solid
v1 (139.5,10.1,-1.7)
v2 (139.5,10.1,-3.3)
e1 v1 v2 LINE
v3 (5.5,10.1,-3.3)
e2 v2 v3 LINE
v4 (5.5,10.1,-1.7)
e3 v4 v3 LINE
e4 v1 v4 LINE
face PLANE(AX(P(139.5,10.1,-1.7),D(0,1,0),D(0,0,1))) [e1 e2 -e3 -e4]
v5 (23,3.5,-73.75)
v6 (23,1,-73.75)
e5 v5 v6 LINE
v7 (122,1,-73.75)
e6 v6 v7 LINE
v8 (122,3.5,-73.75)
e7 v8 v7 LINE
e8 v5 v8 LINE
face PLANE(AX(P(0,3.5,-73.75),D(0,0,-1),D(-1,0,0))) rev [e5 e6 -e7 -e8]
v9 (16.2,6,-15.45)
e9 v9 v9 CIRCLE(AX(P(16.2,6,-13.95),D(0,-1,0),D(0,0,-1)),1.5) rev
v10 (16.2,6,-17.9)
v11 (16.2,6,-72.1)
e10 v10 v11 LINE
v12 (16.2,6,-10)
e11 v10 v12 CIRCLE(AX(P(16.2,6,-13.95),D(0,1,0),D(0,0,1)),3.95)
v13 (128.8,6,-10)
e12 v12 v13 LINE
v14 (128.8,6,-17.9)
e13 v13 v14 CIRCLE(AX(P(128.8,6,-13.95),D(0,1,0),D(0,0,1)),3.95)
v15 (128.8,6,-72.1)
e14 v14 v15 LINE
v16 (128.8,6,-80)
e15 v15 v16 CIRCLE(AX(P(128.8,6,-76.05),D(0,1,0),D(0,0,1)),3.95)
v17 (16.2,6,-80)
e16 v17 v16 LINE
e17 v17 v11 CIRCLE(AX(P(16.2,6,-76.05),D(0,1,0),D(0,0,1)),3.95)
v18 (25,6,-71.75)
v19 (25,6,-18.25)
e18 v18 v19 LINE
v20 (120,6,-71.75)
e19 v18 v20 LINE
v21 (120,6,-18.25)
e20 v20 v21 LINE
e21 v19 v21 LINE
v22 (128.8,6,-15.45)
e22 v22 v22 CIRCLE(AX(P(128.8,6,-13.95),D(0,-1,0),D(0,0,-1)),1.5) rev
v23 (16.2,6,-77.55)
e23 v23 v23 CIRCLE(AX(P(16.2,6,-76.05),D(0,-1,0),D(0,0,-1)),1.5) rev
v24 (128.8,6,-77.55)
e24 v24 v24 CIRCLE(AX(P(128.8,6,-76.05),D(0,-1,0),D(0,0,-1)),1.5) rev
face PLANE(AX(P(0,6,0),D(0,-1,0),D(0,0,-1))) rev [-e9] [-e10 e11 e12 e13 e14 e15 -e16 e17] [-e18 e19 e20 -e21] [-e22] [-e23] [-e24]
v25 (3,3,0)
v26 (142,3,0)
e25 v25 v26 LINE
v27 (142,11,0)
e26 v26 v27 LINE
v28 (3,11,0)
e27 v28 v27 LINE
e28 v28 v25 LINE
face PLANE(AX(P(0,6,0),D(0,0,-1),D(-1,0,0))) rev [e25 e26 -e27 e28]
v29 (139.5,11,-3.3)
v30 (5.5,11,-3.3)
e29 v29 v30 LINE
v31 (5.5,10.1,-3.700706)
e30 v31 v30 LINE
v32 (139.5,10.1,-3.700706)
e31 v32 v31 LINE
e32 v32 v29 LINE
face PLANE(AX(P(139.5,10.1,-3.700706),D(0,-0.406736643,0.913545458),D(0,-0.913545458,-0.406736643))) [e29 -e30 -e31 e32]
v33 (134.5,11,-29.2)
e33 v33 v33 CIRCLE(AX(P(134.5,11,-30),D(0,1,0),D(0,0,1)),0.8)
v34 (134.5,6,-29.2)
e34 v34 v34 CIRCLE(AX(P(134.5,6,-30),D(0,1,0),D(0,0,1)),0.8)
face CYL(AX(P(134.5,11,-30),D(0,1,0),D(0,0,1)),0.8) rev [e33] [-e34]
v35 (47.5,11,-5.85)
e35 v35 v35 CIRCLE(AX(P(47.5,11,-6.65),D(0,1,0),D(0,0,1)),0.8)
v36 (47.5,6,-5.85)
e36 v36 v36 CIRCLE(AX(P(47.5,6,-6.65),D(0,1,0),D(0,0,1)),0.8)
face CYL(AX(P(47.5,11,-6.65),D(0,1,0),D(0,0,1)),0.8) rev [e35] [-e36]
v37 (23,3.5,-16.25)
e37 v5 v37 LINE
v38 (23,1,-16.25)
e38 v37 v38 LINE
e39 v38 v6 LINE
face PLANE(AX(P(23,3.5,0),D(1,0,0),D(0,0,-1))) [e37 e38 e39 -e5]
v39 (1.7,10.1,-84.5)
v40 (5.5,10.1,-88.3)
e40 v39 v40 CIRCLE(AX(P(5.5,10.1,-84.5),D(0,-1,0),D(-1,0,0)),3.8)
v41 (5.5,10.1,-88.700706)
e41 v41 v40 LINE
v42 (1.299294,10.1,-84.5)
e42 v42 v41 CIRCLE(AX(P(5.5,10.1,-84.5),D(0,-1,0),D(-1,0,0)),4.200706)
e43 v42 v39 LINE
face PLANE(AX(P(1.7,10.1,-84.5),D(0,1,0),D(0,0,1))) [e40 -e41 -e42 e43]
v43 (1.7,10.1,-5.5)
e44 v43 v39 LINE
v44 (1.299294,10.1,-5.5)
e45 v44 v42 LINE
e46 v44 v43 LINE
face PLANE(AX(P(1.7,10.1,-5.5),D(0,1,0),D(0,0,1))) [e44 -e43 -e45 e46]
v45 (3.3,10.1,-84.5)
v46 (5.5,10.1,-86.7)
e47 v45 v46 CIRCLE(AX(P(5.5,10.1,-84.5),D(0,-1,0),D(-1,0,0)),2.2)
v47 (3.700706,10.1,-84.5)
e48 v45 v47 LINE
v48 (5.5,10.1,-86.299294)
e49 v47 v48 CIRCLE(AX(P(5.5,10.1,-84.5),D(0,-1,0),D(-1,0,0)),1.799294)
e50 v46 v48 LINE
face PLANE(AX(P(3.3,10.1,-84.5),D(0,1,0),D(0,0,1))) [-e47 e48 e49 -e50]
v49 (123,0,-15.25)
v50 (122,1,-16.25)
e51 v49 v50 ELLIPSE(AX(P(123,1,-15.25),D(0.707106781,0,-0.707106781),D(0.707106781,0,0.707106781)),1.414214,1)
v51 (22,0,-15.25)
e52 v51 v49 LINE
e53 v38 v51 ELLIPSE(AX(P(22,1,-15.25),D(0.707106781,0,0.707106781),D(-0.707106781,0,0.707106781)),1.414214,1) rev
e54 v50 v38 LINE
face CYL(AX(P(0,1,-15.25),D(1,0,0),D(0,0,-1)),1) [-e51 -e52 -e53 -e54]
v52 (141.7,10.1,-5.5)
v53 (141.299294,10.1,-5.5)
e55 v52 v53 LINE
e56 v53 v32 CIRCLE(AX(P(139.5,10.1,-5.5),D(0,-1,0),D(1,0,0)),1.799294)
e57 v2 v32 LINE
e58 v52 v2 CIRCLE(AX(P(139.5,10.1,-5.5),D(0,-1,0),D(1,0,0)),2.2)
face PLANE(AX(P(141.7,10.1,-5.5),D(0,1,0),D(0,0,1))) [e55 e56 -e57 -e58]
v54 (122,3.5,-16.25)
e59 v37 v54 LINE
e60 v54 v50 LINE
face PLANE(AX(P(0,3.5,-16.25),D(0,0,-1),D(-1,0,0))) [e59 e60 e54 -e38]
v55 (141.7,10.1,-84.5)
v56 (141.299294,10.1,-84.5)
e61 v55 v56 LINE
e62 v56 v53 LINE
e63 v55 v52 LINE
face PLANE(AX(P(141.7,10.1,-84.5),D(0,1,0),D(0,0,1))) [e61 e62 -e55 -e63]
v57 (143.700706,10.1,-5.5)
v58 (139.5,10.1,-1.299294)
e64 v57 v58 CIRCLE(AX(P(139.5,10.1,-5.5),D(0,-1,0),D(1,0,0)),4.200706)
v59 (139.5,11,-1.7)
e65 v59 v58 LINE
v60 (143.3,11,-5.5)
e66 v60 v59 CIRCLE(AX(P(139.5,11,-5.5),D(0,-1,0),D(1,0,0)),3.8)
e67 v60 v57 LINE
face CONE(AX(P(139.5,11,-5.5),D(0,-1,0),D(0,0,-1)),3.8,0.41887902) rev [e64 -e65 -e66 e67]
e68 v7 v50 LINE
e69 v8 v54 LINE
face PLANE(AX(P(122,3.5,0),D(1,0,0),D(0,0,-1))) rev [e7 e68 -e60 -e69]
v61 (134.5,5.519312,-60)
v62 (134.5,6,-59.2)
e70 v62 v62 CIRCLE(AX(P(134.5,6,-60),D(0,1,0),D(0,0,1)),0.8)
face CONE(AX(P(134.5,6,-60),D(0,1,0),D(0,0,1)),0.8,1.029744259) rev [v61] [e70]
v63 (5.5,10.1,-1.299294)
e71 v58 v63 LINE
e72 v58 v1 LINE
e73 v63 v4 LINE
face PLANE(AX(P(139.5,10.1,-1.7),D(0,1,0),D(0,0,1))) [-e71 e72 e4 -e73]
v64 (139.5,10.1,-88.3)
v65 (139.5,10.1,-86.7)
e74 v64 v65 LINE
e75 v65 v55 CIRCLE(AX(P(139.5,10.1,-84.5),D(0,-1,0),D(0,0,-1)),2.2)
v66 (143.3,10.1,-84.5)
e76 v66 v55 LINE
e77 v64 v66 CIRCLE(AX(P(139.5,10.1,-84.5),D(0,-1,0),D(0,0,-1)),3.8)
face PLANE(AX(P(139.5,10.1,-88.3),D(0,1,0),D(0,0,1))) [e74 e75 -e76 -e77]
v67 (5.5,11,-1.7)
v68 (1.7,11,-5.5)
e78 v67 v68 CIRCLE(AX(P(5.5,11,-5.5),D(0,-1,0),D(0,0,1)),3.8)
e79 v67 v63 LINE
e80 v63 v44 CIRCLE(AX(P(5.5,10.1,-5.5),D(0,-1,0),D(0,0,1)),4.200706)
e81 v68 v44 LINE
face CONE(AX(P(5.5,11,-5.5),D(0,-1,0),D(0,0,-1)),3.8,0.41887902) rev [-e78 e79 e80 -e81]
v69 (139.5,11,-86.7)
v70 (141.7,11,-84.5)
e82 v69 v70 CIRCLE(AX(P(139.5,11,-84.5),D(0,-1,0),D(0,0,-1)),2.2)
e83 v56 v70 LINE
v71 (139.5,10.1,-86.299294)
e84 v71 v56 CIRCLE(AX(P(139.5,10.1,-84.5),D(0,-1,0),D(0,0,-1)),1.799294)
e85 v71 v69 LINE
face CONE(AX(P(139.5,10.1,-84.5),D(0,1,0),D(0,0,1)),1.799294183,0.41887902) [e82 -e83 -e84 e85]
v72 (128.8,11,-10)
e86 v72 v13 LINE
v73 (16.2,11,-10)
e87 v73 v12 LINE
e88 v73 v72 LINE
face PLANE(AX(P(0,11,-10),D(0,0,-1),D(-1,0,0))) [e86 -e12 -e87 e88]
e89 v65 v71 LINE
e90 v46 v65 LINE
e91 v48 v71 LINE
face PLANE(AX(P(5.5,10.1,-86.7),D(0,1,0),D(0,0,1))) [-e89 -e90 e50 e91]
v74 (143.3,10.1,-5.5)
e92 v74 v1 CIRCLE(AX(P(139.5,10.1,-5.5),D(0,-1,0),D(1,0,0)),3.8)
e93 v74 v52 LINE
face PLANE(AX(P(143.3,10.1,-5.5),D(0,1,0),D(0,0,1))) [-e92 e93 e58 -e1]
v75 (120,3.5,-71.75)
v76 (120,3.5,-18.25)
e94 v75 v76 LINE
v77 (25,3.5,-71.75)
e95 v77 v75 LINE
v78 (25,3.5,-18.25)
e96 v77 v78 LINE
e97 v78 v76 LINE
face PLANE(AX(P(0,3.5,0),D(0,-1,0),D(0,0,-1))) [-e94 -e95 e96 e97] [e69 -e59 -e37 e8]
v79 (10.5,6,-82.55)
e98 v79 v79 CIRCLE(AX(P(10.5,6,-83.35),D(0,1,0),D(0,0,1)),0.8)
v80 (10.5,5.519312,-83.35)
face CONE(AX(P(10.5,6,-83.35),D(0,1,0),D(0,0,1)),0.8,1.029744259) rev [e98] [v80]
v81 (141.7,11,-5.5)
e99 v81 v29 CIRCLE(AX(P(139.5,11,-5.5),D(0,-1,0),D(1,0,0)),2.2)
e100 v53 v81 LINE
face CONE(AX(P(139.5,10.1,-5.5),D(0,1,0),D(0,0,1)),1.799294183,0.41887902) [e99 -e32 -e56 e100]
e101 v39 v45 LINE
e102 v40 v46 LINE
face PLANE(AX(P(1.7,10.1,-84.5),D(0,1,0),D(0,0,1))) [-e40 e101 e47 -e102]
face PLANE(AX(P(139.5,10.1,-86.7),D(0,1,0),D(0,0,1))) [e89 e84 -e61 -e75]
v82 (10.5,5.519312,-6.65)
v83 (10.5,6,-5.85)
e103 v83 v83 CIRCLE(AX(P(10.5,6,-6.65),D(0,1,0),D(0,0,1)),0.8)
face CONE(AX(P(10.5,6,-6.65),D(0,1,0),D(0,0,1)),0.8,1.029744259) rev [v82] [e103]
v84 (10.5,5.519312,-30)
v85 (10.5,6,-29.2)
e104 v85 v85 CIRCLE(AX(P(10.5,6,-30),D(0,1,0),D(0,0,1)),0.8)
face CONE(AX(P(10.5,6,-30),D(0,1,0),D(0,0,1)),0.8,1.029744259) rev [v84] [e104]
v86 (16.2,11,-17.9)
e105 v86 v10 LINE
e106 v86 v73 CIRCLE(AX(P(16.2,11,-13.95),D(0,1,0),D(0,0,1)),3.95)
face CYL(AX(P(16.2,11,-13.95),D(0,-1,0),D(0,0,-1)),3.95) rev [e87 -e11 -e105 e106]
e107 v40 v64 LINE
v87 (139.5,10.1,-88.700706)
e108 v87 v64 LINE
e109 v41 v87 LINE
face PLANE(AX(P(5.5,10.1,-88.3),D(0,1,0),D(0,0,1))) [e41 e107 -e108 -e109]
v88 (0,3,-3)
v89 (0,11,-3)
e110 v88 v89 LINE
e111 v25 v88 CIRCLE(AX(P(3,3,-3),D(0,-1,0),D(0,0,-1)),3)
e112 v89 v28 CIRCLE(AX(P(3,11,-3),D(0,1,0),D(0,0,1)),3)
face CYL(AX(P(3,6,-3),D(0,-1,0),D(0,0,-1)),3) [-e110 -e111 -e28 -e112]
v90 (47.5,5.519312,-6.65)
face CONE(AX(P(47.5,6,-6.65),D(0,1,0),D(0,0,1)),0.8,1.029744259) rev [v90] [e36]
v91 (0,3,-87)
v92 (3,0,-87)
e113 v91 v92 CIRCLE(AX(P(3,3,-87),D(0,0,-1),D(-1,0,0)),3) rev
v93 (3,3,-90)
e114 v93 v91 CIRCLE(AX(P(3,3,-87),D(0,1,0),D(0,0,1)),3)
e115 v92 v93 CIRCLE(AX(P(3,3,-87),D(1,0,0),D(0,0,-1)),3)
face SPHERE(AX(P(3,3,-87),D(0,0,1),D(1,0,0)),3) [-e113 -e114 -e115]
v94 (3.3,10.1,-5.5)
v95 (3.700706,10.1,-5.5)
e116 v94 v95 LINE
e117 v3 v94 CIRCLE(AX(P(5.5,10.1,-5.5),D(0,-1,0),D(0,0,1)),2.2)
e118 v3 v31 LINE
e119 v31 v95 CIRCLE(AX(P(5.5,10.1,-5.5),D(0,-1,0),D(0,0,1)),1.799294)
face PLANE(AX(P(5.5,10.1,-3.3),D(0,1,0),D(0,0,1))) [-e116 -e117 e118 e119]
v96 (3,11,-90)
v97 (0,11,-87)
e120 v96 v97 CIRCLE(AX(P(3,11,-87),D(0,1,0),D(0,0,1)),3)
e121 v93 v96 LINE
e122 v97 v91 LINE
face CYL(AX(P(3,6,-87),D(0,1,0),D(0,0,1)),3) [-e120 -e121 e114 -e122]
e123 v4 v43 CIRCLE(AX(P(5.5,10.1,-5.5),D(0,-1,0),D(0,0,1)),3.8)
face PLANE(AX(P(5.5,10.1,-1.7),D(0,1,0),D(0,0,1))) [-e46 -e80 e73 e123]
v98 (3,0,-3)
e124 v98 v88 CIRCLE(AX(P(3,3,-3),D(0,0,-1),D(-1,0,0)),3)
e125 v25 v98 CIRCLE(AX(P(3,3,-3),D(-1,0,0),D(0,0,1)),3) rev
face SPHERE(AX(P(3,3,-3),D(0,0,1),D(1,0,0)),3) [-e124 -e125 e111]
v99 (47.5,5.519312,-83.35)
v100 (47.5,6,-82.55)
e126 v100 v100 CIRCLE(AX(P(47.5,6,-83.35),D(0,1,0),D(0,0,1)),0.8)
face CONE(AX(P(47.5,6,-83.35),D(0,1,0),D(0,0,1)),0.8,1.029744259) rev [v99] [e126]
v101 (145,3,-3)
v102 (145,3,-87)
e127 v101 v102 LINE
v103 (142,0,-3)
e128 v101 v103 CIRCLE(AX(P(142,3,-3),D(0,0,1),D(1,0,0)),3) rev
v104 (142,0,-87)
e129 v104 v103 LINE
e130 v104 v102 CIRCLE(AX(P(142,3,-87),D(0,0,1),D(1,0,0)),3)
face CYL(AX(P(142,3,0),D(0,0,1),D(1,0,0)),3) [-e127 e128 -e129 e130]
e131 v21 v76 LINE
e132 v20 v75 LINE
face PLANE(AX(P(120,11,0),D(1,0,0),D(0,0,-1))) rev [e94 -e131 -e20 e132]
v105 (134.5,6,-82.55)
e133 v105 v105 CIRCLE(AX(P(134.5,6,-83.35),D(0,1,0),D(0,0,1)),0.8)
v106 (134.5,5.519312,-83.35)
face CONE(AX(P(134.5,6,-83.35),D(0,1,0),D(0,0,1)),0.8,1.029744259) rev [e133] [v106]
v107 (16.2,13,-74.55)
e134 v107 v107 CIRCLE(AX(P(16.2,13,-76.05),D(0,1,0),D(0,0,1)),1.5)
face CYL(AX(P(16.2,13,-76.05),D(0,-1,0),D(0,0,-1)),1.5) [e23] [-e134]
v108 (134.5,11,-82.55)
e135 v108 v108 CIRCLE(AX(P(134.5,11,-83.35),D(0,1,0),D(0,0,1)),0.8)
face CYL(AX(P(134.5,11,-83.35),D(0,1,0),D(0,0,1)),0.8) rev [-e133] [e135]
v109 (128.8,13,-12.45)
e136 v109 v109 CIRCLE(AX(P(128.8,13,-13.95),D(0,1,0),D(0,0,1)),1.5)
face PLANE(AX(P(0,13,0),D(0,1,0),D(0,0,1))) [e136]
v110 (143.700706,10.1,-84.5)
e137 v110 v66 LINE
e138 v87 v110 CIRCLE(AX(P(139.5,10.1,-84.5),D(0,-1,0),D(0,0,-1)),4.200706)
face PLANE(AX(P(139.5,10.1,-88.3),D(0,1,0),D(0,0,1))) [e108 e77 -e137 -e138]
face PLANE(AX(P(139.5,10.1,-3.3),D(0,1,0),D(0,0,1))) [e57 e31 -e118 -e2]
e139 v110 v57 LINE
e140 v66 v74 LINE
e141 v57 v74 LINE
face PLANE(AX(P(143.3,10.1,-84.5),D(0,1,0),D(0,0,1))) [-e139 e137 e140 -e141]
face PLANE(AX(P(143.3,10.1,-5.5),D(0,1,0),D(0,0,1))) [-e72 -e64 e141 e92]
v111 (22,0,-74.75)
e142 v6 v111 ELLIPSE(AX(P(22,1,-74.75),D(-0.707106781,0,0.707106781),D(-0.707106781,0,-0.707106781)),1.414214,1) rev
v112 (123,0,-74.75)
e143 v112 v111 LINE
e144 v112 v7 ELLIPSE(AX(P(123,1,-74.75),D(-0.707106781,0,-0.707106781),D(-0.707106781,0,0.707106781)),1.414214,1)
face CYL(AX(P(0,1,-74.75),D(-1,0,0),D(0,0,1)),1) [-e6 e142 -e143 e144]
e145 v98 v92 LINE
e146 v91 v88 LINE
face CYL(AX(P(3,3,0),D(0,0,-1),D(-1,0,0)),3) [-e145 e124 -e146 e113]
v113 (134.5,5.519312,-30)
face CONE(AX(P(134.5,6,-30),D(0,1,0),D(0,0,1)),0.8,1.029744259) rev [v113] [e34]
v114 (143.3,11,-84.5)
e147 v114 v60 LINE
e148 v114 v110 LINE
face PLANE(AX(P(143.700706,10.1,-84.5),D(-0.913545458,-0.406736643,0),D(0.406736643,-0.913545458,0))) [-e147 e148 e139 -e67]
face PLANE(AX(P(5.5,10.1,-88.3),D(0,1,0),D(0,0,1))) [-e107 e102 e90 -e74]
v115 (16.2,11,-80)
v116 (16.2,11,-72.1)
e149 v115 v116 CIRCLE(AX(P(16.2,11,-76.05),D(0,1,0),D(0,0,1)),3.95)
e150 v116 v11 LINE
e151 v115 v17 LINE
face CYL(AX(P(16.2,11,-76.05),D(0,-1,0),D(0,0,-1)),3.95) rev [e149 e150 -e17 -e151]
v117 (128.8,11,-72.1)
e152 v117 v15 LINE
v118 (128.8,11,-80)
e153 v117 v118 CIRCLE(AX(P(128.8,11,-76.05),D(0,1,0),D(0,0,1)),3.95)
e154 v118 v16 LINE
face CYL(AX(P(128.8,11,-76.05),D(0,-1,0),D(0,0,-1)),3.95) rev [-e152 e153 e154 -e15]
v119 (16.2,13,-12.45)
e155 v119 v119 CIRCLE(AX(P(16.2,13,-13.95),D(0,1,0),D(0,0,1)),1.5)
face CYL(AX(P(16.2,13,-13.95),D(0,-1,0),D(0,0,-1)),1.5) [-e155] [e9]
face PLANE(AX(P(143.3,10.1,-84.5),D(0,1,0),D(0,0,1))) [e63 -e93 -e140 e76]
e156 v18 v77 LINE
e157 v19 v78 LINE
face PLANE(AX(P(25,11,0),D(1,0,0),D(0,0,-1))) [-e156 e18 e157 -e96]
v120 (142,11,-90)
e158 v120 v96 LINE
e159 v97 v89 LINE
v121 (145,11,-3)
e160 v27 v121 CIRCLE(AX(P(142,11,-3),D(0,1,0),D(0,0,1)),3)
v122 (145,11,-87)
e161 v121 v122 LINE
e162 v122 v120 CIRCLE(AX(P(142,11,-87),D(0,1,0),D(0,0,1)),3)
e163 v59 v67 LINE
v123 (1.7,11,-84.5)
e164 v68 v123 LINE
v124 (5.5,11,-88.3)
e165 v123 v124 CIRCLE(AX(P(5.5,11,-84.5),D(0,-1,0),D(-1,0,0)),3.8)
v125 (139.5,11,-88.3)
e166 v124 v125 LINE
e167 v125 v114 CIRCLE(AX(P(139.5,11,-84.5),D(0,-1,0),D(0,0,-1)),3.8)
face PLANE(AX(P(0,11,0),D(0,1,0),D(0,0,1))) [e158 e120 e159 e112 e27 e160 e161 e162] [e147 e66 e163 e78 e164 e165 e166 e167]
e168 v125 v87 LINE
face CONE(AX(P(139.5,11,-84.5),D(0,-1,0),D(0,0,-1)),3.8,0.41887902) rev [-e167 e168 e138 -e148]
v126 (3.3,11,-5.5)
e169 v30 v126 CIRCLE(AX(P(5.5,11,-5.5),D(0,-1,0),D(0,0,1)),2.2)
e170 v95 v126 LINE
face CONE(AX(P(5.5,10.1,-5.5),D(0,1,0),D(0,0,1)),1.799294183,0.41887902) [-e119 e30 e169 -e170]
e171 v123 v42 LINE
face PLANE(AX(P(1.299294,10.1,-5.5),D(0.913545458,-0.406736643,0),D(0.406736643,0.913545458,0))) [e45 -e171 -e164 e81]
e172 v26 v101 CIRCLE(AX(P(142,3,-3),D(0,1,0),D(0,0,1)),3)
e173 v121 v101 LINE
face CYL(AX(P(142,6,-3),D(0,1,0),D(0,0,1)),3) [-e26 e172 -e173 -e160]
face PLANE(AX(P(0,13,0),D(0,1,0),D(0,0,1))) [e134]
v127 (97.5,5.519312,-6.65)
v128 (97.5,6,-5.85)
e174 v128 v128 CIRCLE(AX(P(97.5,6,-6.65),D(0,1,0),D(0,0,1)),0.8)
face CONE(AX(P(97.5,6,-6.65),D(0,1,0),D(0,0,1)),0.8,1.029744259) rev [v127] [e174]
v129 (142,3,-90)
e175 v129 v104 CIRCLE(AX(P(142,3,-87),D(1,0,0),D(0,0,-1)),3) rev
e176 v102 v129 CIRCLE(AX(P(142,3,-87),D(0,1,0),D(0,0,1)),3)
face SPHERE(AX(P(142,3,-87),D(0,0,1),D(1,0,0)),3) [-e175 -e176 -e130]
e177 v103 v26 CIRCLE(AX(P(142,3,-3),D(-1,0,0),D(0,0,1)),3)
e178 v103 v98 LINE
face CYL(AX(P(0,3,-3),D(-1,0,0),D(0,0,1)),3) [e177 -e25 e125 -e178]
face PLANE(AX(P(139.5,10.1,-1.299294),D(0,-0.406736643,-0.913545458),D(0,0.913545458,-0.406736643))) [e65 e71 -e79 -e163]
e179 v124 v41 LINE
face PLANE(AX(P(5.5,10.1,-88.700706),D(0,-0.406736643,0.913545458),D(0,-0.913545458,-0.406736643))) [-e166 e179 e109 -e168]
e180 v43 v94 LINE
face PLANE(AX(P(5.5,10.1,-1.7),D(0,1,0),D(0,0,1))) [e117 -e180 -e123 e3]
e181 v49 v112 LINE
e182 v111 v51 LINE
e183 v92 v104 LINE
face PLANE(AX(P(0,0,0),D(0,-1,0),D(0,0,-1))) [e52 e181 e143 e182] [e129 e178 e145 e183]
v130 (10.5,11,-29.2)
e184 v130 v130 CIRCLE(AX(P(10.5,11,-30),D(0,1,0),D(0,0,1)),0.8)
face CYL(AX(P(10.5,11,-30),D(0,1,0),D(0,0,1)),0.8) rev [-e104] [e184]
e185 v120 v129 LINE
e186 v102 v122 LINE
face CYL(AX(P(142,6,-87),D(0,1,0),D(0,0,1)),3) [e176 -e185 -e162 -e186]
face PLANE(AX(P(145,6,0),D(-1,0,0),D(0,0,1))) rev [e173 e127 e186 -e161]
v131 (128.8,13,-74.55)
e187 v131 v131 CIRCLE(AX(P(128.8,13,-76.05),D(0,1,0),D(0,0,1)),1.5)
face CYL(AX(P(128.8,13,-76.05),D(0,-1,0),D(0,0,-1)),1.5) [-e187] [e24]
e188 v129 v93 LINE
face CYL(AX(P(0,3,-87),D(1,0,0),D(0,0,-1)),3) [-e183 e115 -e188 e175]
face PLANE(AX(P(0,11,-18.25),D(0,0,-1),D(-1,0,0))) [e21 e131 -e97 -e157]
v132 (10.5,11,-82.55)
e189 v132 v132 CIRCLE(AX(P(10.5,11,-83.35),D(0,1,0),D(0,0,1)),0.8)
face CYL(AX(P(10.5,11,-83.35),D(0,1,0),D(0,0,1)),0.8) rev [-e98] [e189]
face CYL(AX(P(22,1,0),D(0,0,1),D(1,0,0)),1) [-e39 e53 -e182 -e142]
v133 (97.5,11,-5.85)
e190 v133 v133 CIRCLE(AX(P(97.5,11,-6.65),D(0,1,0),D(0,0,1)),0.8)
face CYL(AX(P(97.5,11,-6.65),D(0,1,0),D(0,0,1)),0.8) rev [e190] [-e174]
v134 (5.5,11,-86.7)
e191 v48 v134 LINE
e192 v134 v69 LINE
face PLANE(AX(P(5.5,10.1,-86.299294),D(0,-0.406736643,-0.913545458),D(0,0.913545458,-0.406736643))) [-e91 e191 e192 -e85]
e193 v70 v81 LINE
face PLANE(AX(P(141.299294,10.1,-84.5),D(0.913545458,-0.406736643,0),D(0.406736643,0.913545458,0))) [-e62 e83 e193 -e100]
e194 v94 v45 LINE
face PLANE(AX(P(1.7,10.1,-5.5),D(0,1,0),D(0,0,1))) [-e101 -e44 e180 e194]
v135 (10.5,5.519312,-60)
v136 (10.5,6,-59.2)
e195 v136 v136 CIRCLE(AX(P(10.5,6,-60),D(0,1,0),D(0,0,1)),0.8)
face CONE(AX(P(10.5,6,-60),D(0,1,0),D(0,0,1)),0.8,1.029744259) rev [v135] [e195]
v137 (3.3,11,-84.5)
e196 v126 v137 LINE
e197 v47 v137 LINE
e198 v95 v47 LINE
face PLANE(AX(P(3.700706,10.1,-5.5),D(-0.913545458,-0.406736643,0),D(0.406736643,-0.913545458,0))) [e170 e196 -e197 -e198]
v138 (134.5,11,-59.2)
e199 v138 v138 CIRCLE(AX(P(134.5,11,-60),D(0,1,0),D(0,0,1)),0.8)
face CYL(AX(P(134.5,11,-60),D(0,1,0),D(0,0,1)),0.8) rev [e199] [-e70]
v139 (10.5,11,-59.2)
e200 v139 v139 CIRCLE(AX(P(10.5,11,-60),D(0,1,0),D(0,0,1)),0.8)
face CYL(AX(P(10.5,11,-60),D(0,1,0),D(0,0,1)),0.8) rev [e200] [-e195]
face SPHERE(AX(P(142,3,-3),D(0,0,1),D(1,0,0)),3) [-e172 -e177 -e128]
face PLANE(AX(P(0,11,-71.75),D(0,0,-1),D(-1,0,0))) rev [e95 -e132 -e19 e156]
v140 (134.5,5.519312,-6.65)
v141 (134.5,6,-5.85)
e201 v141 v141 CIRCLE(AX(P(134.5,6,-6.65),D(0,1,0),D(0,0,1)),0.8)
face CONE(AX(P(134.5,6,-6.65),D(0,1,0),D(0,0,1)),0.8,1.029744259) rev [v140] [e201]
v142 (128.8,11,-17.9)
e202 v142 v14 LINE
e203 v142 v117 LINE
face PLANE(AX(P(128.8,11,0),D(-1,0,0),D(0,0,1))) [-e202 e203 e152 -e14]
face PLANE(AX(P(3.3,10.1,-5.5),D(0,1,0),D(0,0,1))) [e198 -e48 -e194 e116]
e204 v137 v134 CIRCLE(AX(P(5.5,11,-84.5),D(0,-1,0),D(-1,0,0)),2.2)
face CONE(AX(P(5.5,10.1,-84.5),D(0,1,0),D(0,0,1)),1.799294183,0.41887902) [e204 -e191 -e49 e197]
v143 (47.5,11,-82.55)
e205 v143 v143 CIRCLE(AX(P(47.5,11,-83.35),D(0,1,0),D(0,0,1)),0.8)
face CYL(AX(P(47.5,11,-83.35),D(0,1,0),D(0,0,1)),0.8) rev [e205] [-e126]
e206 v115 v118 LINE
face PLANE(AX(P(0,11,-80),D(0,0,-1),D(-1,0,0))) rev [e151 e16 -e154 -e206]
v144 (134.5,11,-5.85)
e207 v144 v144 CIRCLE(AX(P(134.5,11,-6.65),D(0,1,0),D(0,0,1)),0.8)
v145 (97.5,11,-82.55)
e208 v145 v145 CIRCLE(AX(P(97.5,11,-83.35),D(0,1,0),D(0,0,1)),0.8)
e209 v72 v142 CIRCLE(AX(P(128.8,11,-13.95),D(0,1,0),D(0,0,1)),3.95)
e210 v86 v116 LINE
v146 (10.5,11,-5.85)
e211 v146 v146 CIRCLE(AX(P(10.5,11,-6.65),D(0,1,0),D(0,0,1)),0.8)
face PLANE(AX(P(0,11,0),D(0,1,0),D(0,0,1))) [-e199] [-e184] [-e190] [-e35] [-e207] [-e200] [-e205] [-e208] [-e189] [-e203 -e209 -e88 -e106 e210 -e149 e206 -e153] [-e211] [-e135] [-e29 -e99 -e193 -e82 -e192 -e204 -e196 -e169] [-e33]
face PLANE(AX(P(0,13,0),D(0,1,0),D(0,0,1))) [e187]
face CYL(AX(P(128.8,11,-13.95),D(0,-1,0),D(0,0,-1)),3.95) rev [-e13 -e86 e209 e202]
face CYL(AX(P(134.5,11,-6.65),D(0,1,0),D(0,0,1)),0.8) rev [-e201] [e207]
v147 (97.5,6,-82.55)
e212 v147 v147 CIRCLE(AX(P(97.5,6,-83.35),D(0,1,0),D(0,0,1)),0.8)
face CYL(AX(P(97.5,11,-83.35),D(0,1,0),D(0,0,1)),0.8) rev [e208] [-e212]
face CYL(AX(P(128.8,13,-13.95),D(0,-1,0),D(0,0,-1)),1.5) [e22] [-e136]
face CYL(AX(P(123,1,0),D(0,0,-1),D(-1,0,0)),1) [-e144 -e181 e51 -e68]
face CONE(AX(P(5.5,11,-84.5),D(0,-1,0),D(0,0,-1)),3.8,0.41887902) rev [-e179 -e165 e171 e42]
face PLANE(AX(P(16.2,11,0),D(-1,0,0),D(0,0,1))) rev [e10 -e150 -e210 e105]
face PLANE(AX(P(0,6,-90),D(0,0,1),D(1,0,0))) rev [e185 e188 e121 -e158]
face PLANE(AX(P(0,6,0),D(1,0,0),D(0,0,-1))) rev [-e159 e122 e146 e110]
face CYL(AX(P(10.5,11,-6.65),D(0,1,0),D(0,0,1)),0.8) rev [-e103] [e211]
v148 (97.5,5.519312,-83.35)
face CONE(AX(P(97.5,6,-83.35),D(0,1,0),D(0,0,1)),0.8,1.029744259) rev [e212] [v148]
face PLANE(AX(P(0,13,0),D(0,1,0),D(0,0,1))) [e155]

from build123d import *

# Parameters (mm, degrees)
SKETCH1_W                      = 145
SKETCH1_H                      = 90
BOSS_EXTRUDE1_DEPTH            = 6
SKETCH3_W                      = 145
SKETCH3_H                      = 90
SKETCH3_W_2                    = 135
SKETCH3_H_2                    = 80
BOSS_EXTRUDE2_DEPTH            = 5
SKETCH4_W                      = 47.5
SKETCH4_H                      = 26.75
ACRYLIC_CUTOUT_3MM_DEPTH       = 172.014619258
ACRYLIC_LIP_DEPTH              = 3.5
PEGS_DEPTH                     = 7
BOSS_EXTRUDE4_DEPTH            = 5
FILLET1_R                      = 3
FILLET2_R                      = 1
FILLET3_R                      = 3
FILLET4_R                      = 3
FILLET5_R                      = 3
FILLET6_R                      = 3
M2X0_4_TAPPED_HOLE2_AT_2_COUNT = 2
M2X0_4_TAPPED_HOLE2_AT_2_PITCH = 23.35
M2X0_4_TAPPED_HOLE2_AT_3_COUNT = 2
M2X0_4_TAPPED_HOLE2_AT_3_PITCH = 43.751828533


with BuildPart() as part:
    # Sketch1 → Boss-Extrude1 (new body)
    with BuildSketch(Plane(origin=(0, 0, 0), x_dir=(1, 0, 0), z_dir=(0, 1, 0))):
        with Locations((72.5, 45)):
            Rectangle(SKETCH1_W, SKETCH1_H)
    extrude(amount=BOSS_EXTRUDE1_DEPTH)

    # Sketch3 → Boss-Extrude2 (add)
    with BuildSketch(Plane(origin=(0, 6, 0), x_dir=(1, 0, 0), z_dir=(0, 1, 0))):
        with Locations((72.5, 45)):
            Rectangle(SKETCH3_W, SKETCH3_H)
        with Locations((72.5, 45)):
            Rectangle(SKETCH3_W_2, SKETCH3_H_2, mode=Mode.SUBTRACT)
    extrude(amount=BOSS_EXTRUDE2_DEPTH)

    # Sketch4 → Acrylic Cutout_3mm (cut, through all)
    with BuildSketch(Plane.XZ):
        with Locations((48.75, -31.625)):
            Rectangle(SKETCH4_W, SKETCH4_H)
        with Locations((48.75, -58.375)):
            Rectangle(SKETCH4_W, SKETCH4_H)
        with Locations((96.25, -58.375)):
            Rectangle(SKETCH4_W, SKETCH4_H)
        with Locations((96.25, -31.625)):
            Rectangle(SKETCH4_W, SKETCH4_H)
    extrude(amount=-ACRYLIC_CUTOUT_3MM_DEPTH, mode=Mode.SUBTRACT)

    # Sketch4<4> → Acrylic Lip (cut)
    with BuildSketch(Plane.XZ):
        Polygon((72.5, -18.25), (72.5, -16.25), (23, -16.25), (23, -45), (25, -45), (25, -18.25), align=None)
        Polygon((25, -45), (23, -45), (23, -73.75), (72.5, -73.75), (72.5, -71.75), (25, -71.75), align=None)
        Polygon((122, -73.75), (122, -45), (120, -45), (120, -71.75), (72.5, -71.75), (72.5, -73.75), align=None)
        Polygon((122, -16.25), (72.5, -16.25), (72.5, -18.25), (120, -18.25), (120, -45), (122, -45), align=None)
    extrude(amount=-ACRYLIC_LIP_DEPTH, mode=Mode.SUBTRACT)

    # Sketch5 → Pegs (add)
    with BuildSketch(Plane(origin=(0, 6, 0), x_dir=(1, 0, 0), z_dir=(0, 1, 0))):
        with BuildLine():
            ThreePointArc((16.2, 74.55), (17.260660172, 74.989339828), (17.7, 76.05))
            Line((17.7, 76.05), (16.2, 76.05))
            Line((16.2, 76.05), (16.2, 74.55))
        make_face()
        with BuildLine():
            Line((16.2, 76.05), (17.7, 76.05))
            ThreePointArc((17.7, 76.05), (15.139339828, 77.110660172), (16.2, 74.55))
            Line((16.2, 74.55), (16.2, 76.05))
        make_face()
        with BuildLine():
            ThreePointArc((17.7, 13.95), (17.260660172, 15.010660172), (16.2, 15.45))
            Line((16.2, 15.45), (16.2, 13.95))
            Line((16.2, 13.95), (17.7, 13.95))
        make_face()
        with BuildLine():
            Line((16.2, 13.95), (16.2, 15.45))
            ThreePointArc((16.2, 15.45), (15.139339828, 12.889339828), (17.7, 13.95))
            Line((17.7, 13.95), (16.2, 13.95))
        make_face()
        with BuildLine():
            ThreePointArc((130.3, 13.95), (129.860660172, 15.010660172), (128.8, 15.45))
            Line((128.8, 15.45), (128.8, 13.95))
            Line((128.8, 13.95), (127.3, 13.95))
            ThreePointArc((127.3, 13.95), (128.8, 12.45), (130.3, 13.95))
        make_face()
        with BuildLine():
            Line((128.8, 13.95), (128.8, 15.45))
            ThreePointArc((128.8, 15.45), (127.739339828, 15.010660172), (127.3, 13.95))
            Line((127.3, 13.95), (128.8, 13.95))
        make_face()
        with BuildLine():
            ThreePointArc((130.3, 76.05), (128.8, 77.55), (127.3, 76.05))
            Line((127.3, 76.05), (128.8, 76.05))
            Line((128.8, 76.05), (128.8, 74.55))
            ThreePointArc((128.8, 74.55), (129.860660172, 74.989339828), (130.3, 76.05))
        make_face()
        with BuildLine():
            Line((128.8, 76.05), (127.3, 76.05))
            ThreePointArc((127.3, 76.05), (127.739339828, 74.989339828), (128.8, 74.55))
            Line((128.8, 74.55), (128.8, 76.05))
        make_face()
    extrude(amount=PEGS_DEPTH)

    # Sketch5<4> → Boss-Extrude4 (add)
    with BuildSketch(Plane(origin=(0, 6, 0), x_dir=(1, 0, 0), z_dir=(0, 1, 0))):
        with BuildLine():
            Line((72.5, 80), (72.5, 85))
            Line((72.5, 85), (5, 85))
            Line((5, 85), (5, 45))
            Line((5, 45), (16.2, 45))
            Line((16.2, 45), (16.2, 72.1))
            ThreePointArc((16.2, 72.1), (12.25, 76.05), (16.2, 80))
            Line((16.2, 80), (72.5, 80))
        make_face()
        with BuildLine():
            Line((16.2, 45), (5, 45))
            Line((5, 45), (5, 5))
            Line((5, 5), (72.5, 5))
            Line((72.5, 5), (72.5, 10))
            Line((72.5, 10), (16.2, 10))
            ThreePointArc((16.2, 10), (12.25, 13.95), (16.2, 17.9))
            Line((16.2, 17.9), (16.2, 45))
        make_face()
        with BuildLine():
            Line((140, 5), (140, 45))
            Line((140, 45), (128.8, 45))
            Line((128.8, 45), (128.8, 17.9))
            ThreePointArc((128.8, 17.9), (131.593071786, 16.743071786), (132.75, 13.95))
            ThreePointArc((132.75, 13.95), (131.593071786, 11.156928214), (128.8, 10))
            Line((128.8, 10), (72.5, 10))
            Line((72.5, 10), (72.5, 5))
            Line((72.5, 5), (140, 5))
        make_face()
        with BuildLine():
            Line((140, 85), (72.5, 85))
            Line((72.5, 85), (72.5, 80))
            Line((72.5, 80), (128.8, 80))
            ThreePointArc((128.8, 80), (131.593071786, 78.843071786), (132.75, 76.05))
            ThreePointArc((132.75, 76.05), (131.593071786, 73.256928214), (128.8, 72.1))
            Line((128.8, 72.1), (128.8, 45))
            Line((128.8, 45), (140, 45))
            Line((140, 45), (140, 85))
        make_face()
    extrude(amount=BOSS_EXTRUDE4_DEPTH)

    # Fillet1
    fillet1_edges = [part.edges().sort_by_distance(p)[0] for p in [
        (72.5, 0, -90),
        (145, 0, -45),
        (72.5, 0, 0),
        (0, 0, -45),
    ]]
    fillet(fillet1_edges, radius=FILLET1_R)

    # Fillet2
    fillet2_edges = [part.edges().sort_by_distance(p)[0] for p in [
        (23, 0, -45),
        (72.5, 0, -16.25),
        (72.5, 0, -73.75),
        (122, 0, -45),
    ]]
    fillet(fillet2_edges, radius=FILLET2_R)

    # Fillet3
    # the kernel refuses this fillet: 3 mm, written as the material it takes off along each edge
    with BuildSketch(Plane(origin=(3, 3, -87), x_dir=(-1, 0, 0), z_dir=(0, 0, -1))) as fillet3_piece_1_section:
        Polygon((0, 0), (FILLET3_R, 0), (FILLET3_R, -FILLET3_R), (0, -FILLET3_R), align=None)
    fillet3_piece_1 = extrude(amount=FILLET3_R, mode=Mode.PRIVATE)
    fillet3_piece_1 = fillet3_piece_1 - Plane(origin=(3, 3, -87), x_dir=(0.7071067811865475, 0.7071067811865475, 0), z_dir=(0, 0, -1)) * Sphere(FILLET3_R, mode=Mode.PRIVATE)
    add(fillet3_piece_1, mode=Mode.SUBTRACT)
    with BuildSketch(Plane(origin=(0, 18.5, -90), x_dir=(1, 0, 0), z_dir=(0, -1, 0))) as fillet3_piece_2:
        with BuildLine():
            CenterArc((FILLET3_R, FILLET3_R), FILLET3_R, 180, 90)
            Line((0, FILLET3_R), (0, 0))
            Line((0, 0), (FILLET3_R, 0))
        make_face()
    extrude(amount=15.5, mode=Mode.SUBTRACT)

    # Fillet4
    # the kernel refuses this fillet: 3 mm, written as the material it takes off along each edge
    with BuildSketch(Plane(origin=(142, 3, -87), x_dir=(1, 0, 0), z_dir=(0, 0, -1))) as fillet4_piece_1_section:
        Polygon((0, 0), (FILLET4_R, 0), (FILLET4_R, FILLET4_R), (0, FILLET4_R), align=None)
    fillet4_piece_1 = extrude(amount=FILLET4_R, mode=Mode.PRIVATE)
    fillet4_piece_1 = fillet4_piece_1 - Plane(origin=(142, 3, -87), x_dir=(-0.7071067811865475, 0.7071067811865475, 0), z_dir=(0, 0, -1)) * Sphere(FILLET4_R, mode=Mode.PRIVATE)
    add(fillet4_piece_1, mode=Mode.SUBTRACT)
    with BuildSketch(Plane(origin=(145, 3, -90), x_dir=(-1, 0, 0), z_dir=(0, 1, 0))) as fillet4_piece_2:
        with BuildLine():
            CenterArc((FILLET4_R, FILLET4_R), FILLET4_R, 180, 90)
            Line((0, FILLET4_R), (0, 0))
            Line((0, 0), (FILLET4_R, 0))
        make_face()
    extrude(amount=15.5, mode=Mode.SUBTRACT)

    # Fillet5
    # the kernel refuses this fillet: 3 mm, written as the material it takes off along each edge
    with BuildSketch(Plane(origin=(142, 3, -3), x_dir=(0, 0, 1), z_dir=(1, 0, 0))) as fillet5_piece_1_section:
        Polygon((0, 0), (FILLET5_R, 0), (FILLET5_R, FILLET5_R), (0, FILLET5_R), align=None)
    fillet5_piece_1 = extrude(amount=FILLET5_R, mode=Mode.PRIVATE)
    fillet5_piece_1 = fillet5_piece_1 - Plane(origin=(142, 3, -3), x_dir=(0, 0.7071067811865475, -0.7071067811865475), z_dir=(1, 0, 0)) * Sphere(FILLET5_R, mode=Mode.PRIVATE)
    add(fillet5_piece_1, mode=Mode.SUBTRACT)
    with BuildSketch(Plane(origin=(145, 3, 0), x_dir=(0, 0, -1), z_dir=(0, 1, 0))) as fillet5_piece_2:
        with BuildLine():
            CenterArc((FILLET5_R, FILLET5_R), FILLET5_R, 180, 90)
            Line((0, FILLET5_R), (0, 0))
            Line((0, 0), (FILLET5_R, 0))
        make_face()
    extrude(amount=15.5, mode=Mode.SUBTRACT)

    # Fillet6
    # the kernel refuses this fillet: 3 mm, written as the material it takes off along each edge
    with BuildSketch(Plane(origin=(3, 3, -3), x_dir=(0, 0, 1), z_dir=(-1, 0, 0))) as fillet6_piece_1_section:
        Polygon((0, 0), (FILLET6_R, 0), (FILLET6_R, -FILLET6_R), (0, -FILLET6_R), align=None)
    fillet6_piece_1 = extrude(amount=FILLET6_R, mode=Mode.PRIVATE)
    fillet6_piece_1 = fillet6_piece_1 - Plane(origin=(3, 3, -3), x_dir=(0, 0.7071067811865475, -0.7071067811865475), z_dir=(-1, 0, 0)) * Sphere(FILLET6_R, mode=Mode.PRIVATE)
    add(fillet6_piece_1, mode=Mode.SUBTRACT)
    with BuildSketch(Plane(origin=(0, 18.5, 0), x_dir=(0, 0, -1), z_dir=(0, -1, 0))) as fillet6_piece_2:
        with BuildLine():
            CenterArc((FILLET6_R, FILLET6_R), FILLET6_R, 180, 90)
            Line((0, FILLET6_R), (0, 0))
            Line((0, 0), (FILLET6_R, 0))
        make_face()
    extrude(amount=15.5, mode=Mode.SUBTRACT)

    # Cut-Sweep1: sweep along a path in Sketch6
    with BuildLine(Plane(origin=(0, 11, 0), x_dir=(1, 0, 0), z_dir=(0, 1, 0))) as cut_sweep1_path:
        Line((139.5, 87.5), (5.5, 87.5))
        ThreePointArc((5.5, 87.5), (3.378679656, 86.621320344), (2.5, 84.5))
        Line((2.5, 84.5), (2.5, 5.5))
        ThreePointArc((2.5, 5.5), (3.378679656, 3.378679656), (5.5, 2.5))
        Line((5.5, 2.5), (139.5, 2.5))
        ThreePointArc((139.5, 2.5), (141.621320344, 3.378679656), (142.5, 5.5))
        Line((142.5, 5.5), (142.5, 84.5))
        ThreePointArc((142.5, 84.5), (141.621320344, 86.621320344), (139.5, 87.5))
    # Sketch7 → Cut-Sweep1 (sweep, cut)
    with BuildSketch(Plane(origin=(5.5, 0, 0), x_dir=(0, 0, -1), z_dir=(1, 0, 0))):
        Polygon((1.7, 11), (3.3, 11), (3.700705817, 10.1), (3.3, 10.1), (1.7, 10.1), (1.299294183, 10.1), align=None)
    sweep(path=cut_sweep1_path.line, mode=Mode.SUBTRACT)

    # Sketch13 → M2x0.4 Tapped Hole2 (revolve, cut)
    with BuildSketch(Plane(origin=(10.5, 11, -60), x_dir=(0, 0, 1), z_dir=(1, 0, 0))):
        Polygon((0, 0), (0, 5.480688495), (0.8, 5), (0.8, 0), align=None)
    m2x0_4_tapped_hole2 = revolve(axis=Axis((10.5, 17.35, -60), (0, -1, 0)), mode=Mode.SUBTRACT)

    # M2x0.4 Tapped Hole2 at 2: M2x0.4 Tapped Hole2 ×2
    with Locations(*[(0, 0, -i * M2X0_4_TAPPED_HOLE2_AT_2_PITCH) for i in range(1, M2X0_4_TAPPED_HOLE2_AT_2_COUNT)]):
        add(m2x0_4_tapped_hole2, mode=Mode.SUBTRACT)

    # M2x0.4 Tapped Hole2 at 3: M2x0.4 Tapped Hole2 ×2
    with Locations(*[Vector(0.845678940524949, 0, -0.5336919800339892) * (i * M2X0_4_TAPPED_HOLE2_AT_3_PITCH) for i in range(1, M2X0_4_TAPPED_HOLE2_AT_3_COUNT)]):
        add(m2x0_4_tapped_hole2, mode=Mode.SUBTRACT)

    # Mirror1: M2x0.4 Tapped Hole2 across plane
    add(m2x0_4_tapped_hole2.mirror(Plane.XY.offset(-45)), mode=Mode.SUBTRACT)

    # Mirror1 copy 1 sketch → Mirror1 copy 1 (revolve, cut)
    with BuildSketch(Plane(origin=(10.5, 11, -6.65), x_dir=(0, 0, -1), z_dir=(1, 0, 0))):
        Polygon((0, 0), (0, -5.480688495), (0.8, -5), (0.8, 0), align=None)
    revolve(axis=Axis((10.5, 17.35, -6.65), (0, 1, 0)), mode=Mode.SUBTRACT)

    # Mirror1 copy 2 sketch → Mirror1 copy 2 (revolve, cut)
    with BuildSketch(Plane(origin=(47.5, 11, -6.65), x_dir=(0, 0, -1), z_dir=(1, 0, 0))):
        Polygon((0, 0), (0, -5.480688495), (0.8, -5), (0.8, 0), align=None)
    revolve(axis=Axis((47.5, 17.35, -6.65), (0, 1, 0)), mode=Mode.SUBTRACT)

    # Mirror3: M2x0.4 Tapped Hole2 across plane
    add(m2x0_4_tapped_hole2.mirror(Plane(origin=(72.5, 0, 0), x_dir=(0, 0, 1), z_dir=(1, 0, 0))), mode=Mode.SUBTRACT)

    # Mirror3 copy 1 sketch → Mirror3 copy 1 (revolve, cut)
    with BuildSketch(Plane(origin=(134.5, 11, -83.35), x_dir=(0, 0, 1), z_dir=(-1, 0, 0))):
        Polygon((0, 0), (0, -5.480688495), (0.8, -5), (0.8, 0), align=None)
    revolve(axis=Axis((134.5, 17.35, -83.35), (0, 1, 0)), mode=Mode.SUBTRACT)

    # Mirror3 copy 2 sketch → Mirror3 copy 2 (revolve, cut)
    with BuildSketch(Plane(origin=(97.5, 11, -83.35), x_dir=(0, 0, 1), z_dir=(-1, 0, 0))):
        Polygon((0, 0), (0, -5.480688495), (0.8, -5), (0.8, 0), align=None)
    revolve(axis=Axis((97.5, 17.35, -83.35), (0, 1, 0)), mode=Mode.SUBTRACT)

    # Mirror3 copy 3 sketch → Mirror3 copy 3 (revolve, cut)
    with BuildSketch(Plane(origin=(134.5, 11, -30), x_dir=(0, 0, -1), z_dir=(-1, 0, 0))):
        Polygon((0, 0), (0, 5.480688495), (0.8, 5), (0.8, 0), align=None)
    revolve(axis=Axis((134.5, 17.35, -30), (0, -1, 0)), mode=Mode.SUBTRACT)

    # Mirror3 copy 4 sketch → Mirror3 copy 4 (revolve, cut)
    with BuildSketch(Plane(origin=(134.5, 11, -6.65), x_dir=(0, 0, -1), z_dir=(-1, 0, 0))):
        Polygon((0, 0), (0, 5.480688495), (0.8, 5), (0.8, 0), align=None)
    revolve(axis=Axis((134.5, 17.35, -6.65), (0, -1, 0)), mode=Mode.SUBTRACT)

    # Mirror3 copy 5 sketch → Mirror3 copy 5 (revolve, cut)
    with BuildSketch(Plane(origin=(97.5, 11, -6.65), x_dir=(0, 0, -1), z_dir=(-1, 0, 0))):
        Polygon((0, 0), (0, 5.480688495), (0.8, 5), (0.8, 0), align=None)
    revolve(axis=Axis((97.5, 17.35, -6.65), (0, -1, 0)), mode=Mode.SUBTRACT)


solid = part.part
